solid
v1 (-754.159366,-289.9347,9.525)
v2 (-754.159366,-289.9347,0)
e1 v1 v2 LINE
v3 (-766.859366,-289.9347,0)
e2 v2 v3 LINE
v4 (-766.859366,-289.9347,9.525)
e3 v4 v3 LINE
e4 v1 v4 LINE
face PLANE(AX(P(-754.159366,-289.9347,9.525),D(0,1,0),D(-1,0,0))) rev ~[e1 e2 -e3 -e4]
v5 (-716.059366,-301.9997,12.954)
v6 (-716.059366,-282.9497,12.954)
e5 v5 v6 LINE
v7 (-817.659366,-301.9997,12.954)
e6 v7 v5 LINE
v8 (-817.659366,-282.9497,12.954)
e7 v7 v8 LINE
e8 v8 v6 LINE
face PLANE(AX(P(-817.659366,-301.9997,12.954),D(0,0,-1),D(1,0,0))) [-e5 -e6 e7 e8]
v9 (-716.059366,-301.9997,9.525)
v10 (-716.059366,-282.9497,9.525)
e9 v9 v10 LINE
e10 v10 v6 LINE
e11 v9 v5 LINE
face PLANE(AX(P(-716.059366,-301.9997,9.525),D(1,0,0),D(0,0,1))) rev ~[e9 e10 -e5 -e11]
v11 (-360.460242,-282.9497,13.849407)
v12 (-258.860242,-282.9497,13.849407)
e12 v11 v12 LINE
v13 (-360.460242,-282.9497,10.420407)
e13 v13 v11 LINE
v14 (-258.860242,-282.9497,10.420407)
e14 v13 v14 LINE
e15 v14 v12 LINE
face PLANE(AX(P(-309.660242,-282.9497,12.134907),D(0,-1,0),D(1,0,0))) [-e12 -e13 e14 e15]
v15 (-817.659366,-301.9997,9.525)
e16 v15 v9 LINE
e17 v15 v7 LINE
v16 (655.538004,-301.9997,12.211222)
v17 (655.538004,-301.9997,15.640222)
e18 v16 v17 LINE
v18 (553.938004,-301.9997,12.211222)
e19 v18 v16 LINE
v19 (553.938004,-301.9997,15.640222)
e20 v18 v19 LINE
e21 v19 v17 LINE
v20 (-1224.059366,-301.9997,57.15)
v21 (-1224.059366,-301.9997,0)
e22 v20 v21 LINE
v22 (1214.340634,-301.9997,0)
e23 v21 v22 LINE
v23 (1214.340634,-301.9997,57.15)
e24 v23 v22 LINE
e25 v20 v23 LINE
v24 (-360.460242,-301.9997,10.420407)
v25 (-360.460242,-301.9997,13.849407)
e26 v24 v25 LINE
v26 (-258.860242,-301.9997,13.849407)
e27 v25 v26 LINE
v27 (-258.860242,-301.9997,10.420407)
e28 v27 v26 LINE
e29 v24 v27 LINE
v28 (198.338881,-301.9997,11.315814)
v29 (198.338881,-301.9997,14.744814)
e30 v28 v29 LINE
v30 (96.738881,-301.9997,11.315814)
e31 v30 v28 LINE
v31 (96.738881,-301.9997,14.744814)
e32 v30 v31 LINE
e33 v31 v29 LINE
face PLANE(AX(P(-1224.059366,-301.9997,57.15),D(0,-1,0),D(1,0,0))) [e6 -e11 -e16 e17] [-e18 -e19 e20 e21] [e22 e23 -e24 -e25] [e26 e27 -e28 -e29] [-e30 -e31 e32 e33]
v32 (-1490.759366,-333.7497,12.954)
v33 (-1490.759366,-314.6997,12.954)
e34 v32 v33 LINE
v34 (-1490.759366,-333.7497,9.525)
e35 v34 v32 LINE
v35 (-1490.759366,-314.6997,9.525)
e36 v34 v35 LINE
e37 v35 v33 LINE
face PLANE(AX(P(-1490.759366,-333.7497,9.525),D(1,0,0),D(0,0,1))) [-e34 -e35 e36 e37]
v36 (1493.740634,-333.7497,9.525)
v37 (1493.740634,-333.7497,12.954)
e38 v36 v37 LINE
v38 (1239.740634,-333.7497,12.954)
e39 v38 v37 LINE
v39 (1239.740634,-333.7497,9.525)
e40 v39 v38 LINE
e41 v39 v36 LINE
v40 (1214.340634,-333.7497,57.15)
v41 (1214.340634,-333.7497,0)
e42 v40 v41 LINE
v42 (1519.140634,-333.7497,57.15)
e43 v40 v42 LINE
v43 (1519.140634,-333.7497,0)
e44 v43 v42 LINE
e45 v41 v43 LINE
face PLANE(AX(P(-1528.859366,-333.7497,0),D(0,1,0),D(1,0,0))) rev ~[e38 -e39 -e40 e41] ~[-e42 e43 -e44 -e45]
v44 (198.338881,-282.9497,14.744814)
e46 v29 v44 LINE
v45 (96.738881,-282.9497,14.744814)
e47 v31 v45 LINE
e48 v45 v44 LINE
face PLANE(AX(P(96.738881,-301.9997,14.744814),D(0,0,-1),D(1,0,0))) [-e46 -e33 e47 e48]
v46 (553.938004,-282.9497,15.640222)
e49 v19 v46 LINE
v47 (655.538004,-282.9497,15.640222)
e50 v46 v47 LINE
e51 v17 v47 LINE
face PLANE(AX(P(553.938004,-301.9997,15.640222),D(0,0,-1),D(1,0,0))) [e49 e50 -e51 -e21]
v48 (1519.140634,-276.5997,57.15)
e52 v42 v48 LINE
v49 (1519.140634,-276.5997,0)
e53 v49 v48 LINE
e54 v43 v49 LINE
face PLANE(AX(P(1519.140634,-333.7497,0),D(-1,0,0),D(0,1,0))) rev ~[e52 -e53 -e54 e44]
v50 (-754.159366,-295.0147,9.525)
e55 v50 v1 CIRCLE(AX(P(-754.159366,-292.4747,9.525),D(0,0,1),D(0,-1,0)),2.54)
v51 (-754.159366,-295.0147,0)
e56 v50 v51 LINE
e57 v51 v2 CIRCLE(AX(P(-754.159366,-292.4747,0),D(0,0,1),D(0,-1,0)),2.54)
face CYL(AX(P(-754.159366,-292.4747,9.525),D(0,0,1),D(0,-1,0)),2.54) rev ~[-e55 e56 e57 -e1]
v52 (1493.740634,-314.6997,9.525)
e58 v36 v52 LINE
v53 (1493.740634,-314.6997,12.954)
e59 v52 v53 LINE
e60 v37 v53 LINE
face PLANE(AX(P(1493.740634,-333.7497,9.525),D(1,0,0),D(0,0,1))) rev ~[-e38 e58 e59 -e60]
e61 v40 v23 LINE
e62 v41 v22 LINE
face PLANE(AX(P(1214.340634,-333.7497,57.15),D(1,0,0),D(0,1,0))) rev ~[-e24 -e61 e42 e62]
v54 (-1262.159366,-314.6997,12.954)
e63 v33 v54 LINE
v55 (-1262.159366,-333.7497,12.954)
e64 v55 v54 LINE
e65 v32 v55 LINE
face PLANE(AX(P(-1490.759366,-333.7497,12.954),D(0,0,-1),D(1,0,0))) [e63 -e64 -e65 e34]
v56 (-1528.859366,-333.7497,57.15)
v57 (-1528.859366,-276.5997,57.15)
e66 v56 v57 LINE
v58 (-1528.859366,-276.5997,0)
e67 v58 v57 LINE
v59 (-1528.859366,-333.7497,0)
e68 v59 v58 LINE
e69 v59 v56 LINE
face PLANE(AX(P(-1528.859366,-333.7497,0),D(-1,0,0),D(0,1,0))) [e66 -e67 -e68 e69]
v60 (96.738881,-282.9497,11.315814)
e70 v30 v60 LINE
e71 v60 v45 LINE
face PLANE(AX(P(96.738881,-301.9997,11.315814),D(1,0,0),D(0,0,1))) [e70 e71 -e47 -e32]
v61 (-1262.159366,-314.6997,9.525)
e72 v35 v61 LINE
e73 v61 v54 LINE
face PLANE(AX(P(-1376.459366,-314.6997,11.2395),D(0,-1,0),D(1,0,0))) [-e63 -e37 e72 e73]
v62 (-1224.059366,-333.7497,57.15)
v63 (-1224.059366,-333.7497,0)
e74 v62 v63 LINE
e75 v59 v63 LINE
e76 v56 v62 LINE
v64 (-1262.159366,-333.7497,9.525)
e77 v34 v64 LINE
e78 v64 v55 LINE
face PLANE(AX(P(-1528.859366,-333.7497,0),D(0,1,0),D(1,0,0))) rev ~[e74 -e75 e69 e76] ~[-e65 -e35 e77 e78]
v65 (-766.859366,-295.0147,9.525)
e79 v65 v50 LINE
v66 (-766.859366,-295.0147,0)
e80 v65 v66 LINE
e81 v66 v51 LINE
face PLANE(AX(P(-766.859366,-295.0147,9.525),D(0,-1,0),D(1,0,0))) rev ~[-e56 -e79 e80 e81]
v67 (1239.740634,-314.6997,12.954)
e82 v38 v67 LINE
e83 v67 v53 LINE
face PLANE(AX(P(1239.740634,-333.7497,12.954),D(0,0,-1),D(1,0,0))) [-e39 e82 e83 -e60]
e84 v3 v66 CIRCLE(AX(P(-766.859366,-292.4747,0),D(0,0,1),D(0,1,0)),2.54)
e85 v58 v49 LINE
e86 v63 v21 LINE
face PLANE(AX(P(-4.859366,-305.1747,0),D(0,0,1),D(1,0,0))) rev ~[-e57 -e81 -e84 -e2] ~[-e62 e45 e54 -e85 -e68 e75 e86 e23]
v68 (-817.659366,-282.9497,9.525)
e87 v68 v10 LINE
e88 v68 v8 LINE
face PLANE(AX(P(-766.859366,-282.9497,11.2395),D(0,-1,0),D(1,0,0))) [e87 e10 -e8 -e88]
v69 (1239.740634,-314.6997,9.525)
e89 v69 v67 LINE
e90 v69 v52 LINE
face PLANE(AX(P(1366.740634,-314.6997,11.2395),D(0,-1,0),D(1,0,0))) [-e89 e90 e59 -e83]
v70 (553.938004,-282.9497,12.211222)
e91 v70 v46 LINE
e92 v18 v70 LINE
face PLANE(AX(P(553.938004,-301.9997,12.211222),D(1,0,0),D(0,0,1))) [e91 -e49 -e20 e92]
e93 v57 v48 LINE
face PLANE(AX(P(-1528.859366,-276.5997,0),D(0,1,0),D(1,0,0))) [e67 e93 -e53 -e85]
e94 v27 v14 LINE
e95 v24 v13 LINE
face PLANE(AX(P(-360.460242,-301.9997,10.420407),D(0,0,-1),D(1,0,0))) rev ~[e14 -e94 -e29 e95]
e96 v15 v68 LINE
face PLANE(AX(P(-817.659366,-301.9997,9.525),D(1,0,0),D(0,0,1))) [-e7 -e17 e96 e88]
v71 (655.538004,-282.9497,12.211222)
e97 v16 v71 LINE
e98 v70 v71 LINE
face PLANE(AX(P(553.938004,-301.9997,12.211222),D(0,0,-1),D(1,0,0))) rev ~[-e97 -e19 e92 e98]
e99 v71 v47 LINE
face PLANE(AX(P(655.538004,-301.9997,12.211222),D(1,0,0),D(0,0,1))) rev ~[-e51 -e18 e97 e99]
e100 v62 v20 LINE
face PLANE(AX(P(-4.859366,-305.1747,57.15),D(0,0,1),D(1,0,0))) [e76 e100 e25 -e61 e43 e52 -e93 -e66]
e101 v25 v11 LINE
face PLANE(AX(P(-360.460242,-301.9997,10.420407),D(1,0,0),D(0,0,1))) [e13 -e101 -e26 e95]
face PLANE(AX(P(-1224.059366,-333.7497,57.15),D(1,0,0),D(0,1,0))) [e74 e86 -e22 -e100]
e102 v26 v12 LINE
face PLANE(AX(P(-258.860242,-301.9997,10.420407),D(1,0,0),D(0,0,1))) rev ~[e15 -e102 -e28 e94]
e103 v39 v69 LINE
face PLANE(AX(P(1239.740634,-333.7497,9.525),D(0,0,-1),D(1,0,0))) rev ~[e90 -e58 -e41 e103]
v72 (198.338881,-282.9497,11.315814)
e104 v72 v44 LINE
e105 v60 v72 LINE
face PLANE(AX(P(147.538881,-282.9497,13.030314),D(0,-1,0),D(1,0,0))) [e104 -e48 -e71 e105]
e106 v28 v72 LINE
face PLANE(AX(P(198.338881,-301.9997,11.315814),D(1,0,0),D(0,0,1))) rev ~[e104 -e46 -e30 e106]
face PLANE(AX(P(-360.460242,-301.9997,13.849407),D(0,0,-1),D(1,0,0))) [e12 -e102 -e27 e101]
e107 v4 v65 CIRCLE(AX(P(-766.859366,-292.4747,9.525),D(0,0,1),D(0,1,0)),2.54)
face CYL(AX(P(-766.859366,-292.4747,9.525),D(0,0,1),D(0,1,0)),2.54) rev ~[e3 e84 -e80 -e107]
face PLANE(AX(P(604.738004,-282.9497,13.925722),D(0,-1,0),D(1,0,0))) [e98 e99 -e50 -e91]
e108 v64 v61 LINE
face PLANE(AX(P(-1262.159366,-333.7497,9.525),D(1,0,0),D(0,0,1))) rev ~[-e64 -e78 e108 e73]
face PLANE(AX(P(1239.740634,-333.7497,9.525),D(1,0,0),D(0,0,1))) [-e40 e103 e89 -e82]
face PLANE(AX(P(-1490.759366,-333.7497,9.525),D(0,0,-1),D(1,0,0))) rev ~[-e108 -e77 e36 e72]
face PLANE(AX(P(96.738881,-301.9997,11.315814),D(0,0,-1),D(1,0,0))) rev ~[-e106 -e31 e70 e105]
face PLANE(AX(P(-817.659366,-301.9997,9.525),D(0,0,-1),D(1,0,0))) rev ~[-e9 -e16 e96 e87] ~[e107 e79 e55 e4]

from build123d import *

# Parameters (mm, degrees)
F0_W      = 3048
F0_H      = 57.15
F2_DEPTH  = 57.15
F3_W      = 2438.4
F3_H      = 31.75
F4_DEPTH  = 57.15
F5_W      = 228.6
F5_H      = 3.429
F6_DEPTH  = 19.05
F7_W      = 254
F7_H      = 3.429
F8_DEPTH  = 19.05
F9_W      = 101.6
F9_H      = 3.429
F10_DEPTH = 19.05
F12_DEPTH = 9.525


# Not quite as in the source:
# - a variable given as a bare number and used for a length is read in inches; the dataset says mm whatever the document's units were


with BuildPart() as f2:
    # F0 (on Top) → F2 (new body)
    with BuildSketch(Plane.XY):
        with Locations((-4.8593655229, -305.1746997266)):
            Rectangle(F0_W, F0_H)
    extrude(amount=F2_DEPTH)

    # F3 (on face) → F4 (cut, through all)
    with BuildSketch(Plane.XY.offset(57.15)):
        with Locations((-4.8593655229, -317.8746997266)):
            Rectangle(F3_W, F3_H)
    extrude(amount=-F4_DEPTH, mode=Mode.SUBTRACT)

    # F5 (on face) → F6 (cut)
    with BuildSketch(Plane.XZ.offset(333.7496997266)):
        with Locations((-1376.4593655229, 11.2395)):
            Rectangle(F5_W, F5_H)
    extrude(amount=-F6_DEPTH, mode=Mode.SUBTRACT)

    # F7 (on face) → F8 (cut)
    with BuildSketch(Plane.XZ.offset(333.7496997266)):
        with Locations((1366.7406344771, 11.2395)):
            Rectangle(F7_W, F7_H)
    extrude(amount=-F8_DEPTH, mode=Mode.SUBTRACT)

    # F9 (on face) → F10 (cut)
    with BuildSketch(Plane.XZ.offset(301.9996997266)):
        with Locations((-766.8593655229, 11.2395)):
            Rectangle(F9_W, F9_H)
        with Locations((-309.6602423327, 12.1349072401)):
            Rectangle(F9_W, F9_H)
        with Locations((147.5388808575, 13.0303144803)):
            Rectangle(F9_W, F9_H)
        with Locations((604.7380040477, 13.9257217204)):
            Rectangle(F9_W, F9_H)
    extrude(amount=-F10_DEPTH, mode=Mode.SUBTRACT)

    # F11 (on face) → F12 (cut, through all)
    with BuildSketch(Plane.XY.offset(9.525)):
        with BuildLine():
            Line((-754.1593655229, -289.9346997266), (-766.8593655229, -289.9346997266))
            ThreePointArc((-766.8593655229, -289.9346997266), (-769.3993655229, -292.4746997266), (-766.8593655229, -295.0146997266))
            Line((-766.8593655229, -295.0146997266), (-754.1593655229, -295.0146997266))
            ThreePointArc((-754.1593655229, -295.0146997266), (-751.6193655229, -292.4746997266), (-754.1593655229, -289.9346997266))
        make_face()
    extrude(amount=-F12_DEPTH, mode=Mode.SUBTRACT)


solid = f2.part
